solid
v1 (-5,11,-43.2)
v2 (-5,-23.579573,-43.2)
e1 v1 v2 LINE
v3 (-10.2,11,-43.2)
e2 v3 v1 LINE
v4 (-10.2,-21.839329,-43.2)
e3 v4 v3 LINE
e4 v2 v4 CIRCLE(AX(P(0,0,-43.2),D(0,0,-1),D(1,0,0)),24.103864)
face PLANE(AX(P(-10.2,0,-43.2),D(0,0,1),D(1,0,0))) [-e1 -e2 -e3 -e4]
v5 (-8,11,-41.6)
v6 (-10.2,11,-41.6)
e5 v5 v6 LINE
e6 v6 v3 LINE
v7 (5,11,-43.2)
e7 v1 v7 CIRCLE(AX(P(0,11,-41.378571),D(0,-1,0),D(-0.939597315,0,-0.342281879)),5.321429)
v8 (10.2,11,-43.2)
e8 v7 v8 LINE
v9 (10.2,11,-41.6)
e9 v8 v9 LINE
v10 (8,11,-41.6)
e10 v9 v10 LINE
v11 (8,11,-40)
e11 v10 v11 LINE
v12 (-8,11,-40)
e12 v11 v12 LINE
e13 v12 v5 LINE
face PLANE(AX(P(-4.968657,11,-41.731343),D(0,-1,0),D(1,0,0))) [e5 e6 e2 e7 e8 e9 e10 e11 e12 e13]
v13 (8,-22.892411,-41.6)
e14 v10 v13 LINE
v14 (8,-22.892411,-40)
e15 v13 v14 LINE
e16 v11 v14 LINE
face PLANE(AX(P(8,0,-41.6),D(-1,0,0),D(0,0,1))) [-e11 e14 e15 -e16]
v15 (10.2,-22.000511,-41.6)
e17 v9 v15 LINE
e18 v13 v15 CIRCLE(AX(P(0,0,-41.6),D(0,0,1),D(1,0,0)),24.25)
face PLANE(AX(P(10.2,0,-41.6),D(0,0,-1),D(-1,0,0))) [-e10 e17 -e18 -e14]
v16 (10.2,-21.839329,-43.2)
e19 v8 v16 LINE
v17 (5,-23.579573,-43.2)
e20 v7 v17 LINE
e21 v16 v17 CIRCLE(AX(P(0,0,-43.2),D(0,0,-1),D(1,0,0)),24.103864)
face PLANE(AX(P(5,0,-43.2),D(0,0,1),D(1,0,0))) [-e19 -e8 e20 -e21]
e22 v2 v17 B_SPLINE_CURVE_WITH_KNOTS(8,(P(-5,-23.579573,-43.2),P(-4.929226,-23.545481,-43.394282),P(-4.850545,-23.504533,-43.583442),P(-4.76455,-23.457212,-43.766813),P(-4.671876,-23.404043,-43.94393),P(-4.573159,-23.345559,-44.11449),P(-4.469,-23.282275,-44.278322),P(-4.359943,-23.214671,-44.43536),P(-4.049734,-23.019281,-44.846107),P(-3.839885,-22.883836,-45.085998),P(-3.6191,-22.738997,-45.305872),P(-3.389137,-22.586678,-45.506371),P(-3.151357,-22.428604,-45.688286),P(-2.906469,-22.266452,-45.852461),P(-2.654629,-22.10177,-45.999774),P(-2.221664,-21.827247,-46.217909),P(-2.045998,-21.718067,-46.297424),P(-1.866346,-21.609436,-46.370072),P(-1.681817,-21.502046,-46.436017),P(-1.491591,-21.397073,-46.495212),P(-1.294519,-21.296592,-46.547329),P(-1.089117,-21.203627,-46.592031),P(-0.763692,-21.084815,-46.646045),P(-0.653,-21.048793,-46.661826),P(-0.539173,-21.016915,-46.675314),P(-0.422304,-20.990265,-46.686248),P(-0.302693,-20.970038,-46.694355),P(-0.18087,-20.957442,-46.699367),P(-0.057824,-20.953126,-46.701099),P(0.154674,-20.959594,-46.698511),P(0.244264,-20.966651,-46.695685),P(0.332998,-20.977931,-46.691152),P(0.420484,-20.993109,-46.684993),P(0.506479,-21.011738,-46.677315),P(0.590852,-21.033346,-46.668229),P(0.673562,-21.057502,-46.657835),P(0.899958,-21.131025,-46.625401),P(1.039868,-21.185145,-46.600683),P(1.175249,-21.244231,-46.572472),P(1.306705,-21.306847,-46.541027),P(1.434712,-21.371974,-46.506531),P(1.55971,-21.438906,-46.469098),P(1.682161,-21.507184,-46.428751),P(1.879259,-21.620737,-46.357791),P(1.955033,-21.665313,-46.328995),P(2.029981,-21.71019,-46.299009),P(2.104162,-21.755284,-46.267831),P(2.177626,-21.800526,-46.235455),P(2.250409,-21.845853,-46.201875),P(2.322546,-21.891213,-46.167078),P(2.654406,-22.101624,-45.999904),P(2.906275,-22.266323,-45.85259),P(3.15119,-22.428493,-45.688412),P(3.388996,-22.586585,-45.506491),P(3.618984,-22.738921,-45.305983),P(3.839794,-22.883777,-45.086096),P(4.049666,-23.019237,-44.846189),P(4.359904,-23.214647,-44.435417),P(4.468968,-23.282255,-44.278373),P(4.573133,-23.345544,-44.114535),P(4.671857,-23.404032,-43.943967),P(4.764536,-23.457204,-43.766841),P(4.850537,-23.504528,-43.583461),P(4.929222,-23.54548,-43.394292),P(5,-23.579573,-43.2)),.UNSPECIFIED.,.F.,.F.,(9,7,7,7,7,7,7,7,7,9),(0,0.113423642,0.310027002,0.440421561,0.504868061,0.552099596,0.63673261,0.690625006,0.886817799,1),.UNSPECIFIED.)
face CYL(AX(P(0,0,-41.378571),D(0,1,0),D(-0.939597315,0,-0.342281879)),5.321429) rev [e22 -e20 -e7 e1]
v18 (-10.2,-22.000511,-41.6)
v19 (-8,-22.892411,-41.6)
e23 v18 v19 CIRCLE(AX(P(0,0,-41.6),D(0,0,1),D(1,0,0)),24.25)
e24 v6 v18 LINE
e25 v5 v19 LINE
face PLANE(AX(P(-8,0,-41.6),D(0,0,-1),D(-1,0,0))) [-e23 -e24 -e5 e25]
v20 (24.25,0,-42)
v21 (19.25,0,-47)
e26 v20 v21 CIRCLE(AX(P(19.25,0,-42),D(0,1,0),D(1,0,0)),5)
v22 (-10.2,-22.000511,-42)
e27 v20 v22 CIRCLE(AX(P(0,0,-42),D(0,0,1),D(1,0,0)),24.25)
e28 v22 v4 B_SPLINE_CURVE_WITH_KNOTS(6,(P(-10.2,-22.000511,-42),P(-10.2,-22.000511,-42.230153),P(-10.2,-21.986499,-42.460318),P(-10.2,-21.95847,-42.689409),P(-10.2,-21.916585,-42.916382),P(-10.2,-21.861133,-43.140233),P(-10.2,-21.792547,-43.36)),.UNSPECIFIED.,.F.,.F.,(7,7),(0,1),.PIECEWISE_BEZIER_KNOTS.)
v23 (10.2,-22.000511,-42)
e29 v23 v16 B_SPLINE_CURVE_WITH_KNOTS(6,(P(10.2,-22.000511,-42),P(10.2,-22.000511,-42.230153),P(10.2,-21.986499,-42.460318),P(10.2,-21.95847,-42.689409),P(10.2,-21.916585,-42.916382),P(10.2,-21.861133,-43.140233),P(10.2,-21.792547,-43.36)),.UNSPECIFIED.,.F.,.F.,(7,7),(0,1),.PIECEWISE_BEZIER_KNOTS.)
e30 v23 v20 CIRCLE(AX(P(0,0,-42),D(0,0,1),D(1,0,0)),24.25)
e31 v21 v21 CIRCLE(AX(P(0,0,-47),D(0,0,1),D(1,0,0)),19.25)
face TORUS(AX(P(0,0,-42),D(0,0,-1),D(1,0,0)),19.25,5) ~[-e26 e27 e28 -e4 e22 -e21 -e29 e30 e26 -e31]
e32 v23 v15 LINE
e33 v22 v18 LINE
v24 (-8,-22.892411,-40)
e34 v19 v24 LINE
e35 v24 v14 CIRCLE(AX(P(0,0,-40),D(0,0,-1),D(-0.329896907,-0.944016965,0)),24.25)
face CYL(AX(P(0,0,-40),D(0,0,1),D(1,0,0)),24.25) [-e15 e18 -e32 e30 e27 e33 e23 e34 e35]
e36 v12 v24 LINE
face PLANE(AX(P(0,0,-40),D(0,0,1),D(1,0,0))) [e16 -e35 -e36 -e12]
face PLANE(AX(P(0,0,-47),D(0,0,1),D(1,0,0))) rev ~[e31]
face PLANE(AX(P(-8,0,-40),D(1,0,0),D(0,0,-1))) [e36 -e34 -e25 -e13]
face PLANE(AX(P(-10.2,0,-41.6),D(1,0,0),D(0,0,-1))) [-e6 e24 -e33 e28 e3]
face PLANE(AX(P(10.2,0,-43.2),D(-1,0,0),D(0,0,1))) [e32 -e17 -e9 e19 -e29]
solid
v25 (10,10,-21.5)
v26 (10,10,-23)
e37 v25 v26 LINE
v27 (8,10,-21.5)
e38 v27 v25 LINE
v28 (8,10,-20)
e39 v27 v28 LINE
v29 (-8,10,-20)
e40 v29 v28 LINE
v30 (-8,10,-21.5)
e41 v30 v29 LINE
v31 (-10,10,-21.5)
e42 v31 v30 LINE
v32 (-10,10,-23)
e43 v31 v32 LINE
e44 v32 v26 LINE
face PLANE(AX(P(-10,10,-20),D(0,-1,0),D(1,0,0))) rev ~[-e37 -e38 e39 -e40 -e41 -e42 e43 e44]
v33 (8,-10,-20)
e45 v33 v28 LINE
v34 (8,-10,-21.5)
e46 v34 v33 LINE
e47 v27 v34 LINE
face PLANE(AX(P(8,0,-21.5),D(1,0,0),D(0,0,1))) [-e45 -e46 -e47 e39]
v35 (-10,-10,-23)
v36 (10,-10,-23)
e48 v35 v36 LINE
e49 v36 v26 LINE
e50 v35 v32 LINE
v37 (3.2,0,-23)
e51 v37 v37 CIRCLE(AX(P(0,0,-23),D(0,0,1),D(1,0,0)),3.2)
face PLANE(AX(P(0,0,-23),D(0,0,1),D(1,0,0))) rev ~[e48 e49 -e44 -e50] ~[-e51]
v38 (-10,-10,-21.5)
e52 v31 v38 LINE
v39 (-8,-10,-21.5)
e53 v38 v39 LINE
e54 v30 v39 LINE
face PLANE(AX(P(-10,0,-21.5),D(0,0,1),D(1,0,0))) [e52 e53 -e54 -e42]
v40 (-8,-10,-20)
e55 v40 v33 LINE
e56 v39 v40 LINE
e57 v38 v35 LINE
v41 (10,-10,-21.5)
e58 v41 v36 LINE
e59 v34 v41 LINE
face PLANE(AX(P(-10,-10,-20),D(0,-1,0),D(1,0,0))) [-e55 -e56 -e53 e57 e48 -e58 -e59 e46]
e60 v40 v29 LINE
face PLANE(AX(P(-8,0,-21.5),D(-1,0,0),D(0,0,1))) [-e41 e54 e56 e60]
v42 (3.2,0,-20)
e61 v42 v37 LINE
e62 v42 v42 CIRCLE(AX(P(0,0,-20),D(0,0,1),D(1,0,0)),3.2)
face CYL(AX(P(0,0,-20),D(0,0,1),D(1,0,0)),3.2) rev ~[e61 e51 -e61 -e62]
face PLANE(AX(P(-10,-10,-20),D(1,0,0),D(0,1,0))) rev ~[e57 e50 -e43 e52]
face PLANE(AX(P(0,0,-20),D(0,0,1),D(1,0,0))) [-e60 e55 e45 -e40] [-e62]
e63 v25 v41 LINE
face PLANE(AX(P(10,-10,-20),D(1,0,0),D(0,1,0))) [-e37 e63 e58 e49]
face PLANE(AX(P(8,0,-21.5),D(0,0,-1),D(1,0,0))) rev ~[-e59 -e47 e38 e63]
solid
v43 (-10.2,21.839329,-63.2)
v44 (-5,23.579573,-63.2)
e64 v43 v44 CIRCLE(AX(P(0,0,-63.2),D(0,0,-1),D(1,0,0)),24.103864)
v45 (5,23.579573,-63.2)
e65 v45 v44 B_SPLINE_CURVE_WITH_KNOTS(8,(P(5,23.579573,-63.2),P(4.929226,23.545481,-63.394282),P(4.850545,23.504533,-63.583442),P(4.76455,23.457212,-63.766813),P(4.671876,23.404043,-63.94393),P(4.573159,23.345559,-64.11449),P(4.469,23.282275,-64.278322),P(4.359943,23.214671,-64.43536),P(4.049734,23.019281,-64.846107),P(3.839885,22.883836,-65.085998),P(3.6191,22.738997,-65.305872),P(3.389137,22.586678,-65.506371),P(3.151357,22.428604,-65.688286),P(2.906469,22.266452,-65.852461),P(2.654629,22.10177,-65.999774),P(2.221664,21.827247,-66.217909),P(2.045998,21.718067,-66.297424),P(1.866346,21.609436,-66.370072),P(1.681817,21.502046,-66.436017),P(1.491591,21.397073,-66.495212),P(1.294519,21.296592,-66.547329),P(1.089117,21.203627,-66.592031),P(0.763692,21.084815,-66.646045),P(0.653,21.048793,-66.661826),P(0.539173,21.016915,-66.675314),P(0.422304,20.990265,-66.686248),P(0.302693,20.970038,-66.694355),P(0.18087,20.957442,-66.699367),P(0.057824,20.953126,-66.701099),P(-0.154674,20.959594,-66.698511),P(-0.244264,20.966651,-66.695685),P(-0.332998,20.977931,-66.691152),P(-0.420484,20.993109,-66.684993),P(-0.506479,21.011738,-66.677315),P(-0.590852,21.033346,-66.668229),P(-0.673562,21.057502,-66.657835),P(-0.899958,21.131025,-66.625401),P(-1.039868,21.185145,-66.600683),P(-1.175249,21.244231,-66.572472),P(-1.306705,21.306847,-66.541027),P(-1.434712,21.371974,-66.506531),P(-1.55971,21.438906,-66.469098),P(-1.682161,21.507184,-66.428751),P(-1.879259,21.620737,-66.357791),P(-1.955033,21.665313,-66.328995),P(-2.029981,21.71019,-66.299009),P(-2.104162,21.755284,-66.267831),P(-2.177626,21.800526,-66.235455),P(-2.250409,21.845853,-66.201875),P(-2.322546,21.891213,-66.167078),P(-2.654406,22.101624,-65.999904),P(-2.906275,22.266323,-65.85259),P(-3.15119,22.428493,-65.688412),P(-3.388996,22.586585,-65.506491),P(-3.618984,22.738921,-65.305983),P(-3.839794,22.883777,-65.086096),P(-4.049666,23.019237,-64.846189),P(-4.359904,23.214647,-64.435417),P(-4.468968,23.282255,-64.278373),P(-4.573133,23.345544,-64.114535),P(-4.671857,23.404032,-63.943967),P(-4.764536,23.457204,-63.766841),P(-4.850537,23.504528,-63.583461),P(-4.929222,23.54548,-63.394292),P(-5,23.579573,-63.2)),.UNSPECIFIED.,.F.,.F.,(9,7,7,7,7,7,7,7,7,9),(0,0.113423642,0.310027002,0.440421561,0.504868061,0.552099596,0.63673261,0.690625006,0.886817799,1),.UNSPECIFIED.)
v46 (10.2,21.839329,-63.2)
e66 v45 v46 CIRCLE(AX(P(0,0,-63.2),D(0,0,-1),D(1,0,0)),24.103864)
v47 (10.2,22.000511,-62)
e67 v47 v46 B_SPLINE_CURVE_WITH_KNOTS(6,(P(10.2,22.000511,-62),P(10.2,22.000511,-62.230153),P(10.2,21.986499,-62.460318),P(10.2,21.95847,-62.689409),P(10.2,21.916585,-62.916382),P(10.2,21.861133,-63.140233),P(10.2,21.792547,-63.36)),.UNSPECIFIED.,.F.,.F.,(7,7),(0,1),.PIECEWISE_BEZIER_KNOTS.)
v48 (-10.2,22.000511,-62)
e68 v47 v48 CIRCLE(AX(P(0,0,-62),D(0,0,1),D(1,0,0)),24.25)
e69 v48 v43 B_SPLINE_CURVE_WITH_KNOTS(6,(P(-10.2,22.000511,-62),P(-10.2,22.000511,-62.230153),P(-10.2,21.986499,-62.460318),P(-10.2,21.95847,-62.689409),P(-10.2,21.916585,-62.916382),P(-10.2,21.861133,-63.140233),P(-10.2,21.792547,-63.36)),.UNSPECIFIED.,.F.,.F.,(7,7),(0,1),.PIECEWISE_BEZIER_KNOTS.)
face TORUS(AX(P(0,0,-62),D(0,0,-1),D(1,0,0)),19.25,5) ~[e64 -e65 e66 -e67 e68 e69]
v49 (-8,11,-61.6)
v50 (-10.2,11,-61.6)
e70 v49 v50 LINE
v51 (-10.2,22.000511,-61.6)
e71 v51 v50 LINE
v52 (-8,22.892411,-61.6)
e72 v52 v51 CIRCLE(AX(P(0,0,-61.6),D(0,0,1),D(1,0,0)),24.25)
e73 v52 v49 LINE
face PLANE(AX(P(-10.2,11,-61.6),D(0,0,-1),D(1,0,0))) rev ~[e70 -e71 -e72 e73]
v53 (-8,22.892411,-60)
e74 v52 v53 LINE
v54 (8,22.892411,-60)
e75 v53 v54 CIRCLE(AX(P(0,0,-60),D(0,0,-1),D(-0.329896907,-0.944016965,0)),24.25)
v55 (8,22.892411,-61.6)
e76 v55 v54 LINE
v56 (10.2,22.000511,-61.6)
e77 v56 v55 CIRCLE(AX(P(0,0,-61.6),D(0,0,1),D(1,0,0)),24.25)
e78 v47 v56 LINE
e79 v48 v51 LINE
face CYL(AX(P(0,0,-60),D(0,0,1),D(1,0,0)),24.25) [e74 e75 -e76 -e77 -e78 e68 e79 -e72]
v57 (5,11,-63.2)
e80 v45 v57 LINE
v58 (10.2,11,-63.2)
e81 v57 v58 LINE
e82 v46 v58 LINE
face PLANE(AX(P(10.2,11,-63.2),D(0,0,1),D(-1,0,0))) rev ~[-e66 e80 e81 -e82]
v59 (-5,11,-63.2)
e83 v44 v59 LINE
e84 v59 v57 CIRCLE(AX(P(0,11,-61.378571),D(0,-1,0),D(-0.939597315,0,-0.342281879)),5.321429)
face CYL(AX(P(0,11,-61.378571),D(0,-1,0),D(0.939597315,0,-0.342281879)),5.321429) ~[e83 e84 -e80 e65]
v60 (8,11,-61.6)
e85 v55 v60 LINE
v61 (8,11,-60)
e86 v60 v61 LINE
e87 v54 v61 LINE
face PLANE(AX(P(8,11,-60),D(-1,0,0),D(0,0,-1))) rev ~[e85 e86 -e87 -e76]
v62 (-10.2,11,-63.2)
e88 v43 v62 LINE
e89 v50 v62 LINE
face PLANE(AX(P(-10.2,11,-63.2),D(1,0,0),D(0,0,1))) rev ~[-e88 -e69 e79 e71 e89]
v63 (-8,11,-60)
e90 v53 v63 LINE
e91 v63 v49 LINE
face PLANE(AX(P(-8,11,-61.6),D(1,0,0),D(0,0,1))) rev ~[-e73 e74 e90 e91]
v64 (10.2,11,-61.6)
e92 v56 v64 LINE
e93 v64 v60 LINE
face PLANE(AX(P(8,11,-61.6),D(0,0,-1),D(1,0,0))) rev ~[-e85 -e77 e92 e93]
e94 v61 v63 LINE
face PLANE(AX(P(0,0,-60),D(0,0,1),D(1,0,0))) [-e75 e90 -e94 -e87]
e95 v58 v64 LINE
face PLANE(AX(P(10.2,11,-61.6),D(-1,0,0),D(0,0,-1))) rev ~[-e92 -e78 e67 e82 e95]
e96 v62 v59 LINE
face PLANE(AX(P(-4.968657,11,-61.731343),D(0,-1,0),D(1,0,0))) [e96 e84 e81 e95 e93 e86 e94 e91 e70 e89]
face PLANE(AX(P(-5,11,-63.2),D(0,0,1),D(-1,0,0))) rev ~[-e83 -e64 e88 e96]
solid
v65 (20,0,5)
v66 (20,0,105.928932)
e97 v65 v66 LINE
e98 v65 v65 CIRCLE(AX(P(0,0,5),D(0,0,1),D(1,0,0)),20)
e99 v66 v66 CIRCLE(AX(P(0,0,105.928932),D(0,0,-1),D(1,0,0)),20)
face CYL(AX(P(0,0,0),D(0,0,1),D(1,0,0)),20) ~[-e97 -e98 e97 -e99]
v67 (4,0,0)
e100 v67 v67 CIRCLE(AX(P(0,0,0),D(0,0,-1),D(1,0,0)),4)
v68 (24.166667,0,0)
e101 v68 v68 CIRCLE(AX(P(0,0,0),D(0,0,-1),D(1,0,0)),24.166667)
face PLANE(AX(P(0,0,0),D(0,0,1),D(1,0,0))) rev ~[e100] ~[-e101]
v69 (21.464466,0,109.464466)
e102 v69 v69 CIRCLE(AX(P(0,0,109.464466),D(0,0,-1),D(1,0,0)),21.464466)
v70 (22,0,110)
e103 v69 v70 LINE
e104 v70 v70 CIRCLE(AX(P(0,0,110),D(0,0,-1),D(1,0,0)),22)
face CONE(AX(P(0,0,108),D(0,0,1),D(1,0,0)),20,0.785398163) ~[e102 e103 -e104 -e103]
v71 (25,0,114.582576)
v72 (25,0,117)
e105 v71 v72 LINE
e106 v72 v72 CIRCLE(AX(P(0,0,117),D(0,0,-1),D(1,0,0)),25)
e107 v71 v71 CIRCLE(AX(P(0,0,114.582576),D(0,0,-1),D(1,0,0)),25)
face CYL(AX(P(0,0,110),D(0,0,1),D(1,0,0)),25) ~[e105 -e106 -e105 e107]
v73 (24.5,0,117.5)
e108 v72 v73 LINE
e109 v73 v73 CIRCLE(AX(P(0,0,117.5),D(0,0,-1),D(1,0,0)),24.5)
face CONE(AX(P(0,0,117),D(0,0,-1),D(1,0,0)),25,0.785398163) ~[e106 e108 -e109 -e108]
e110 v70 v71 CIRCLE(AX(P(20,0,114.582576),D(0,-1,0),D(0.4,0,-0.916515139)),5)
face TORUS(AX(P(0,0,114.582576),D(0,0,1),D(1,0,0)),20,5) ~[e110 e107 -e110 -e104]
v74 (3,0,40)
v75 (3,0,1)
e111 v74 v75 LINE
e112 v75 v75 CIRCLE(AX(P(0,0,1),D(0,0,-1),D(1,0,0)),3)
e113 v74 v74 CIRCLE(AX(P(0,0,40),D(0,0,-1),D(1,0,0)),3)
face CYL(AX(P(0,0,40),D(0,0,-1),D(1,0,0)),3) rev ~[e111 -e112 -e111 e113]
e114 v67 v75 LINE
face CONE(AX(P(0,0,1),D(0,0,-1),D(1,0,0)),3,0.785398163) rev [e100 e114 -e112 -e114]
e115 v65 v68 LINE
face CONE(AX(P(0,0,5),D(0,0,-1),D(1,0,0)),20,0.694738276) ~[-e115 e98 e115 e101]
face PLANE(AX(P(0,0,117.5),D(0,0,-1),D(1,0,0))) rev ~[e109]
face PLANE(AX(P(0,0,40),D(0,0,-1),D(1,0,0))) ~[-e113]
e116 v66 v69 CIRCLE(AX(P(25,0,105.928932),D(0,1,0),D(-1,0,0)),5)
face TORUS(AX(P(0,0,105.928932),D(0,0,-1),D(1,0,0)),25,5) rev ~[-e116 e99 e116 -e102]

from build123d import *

# Parameters (mm, degrees)
F2_SIZE     = 2
F4_SIZE     = 1
F5_SIZE     = 0.5
F6_R        = 25
F6_R_2      = 20
F7_DEPTH    = 5
F8_S5_R     = 20
F8_T6_DEPTH = 37
F10_W       = 20
F10_H       = 20
F10_R       = 3.2
F11_DEPTH   = 3
F12_W       = 2
F12_H       = 1.5
F13_DEPTH   = 10
F15_R       = 24.25
F16_DEPTH   = 7
F17_R       = 5
F19_DEPTH   = 25
F20_DEPTH   = 11
F23_DEPTH   = 50


# Not quite as in the source:
# - a fillet or chamfer that OpenCascade refuses, or shapes differently, is made with other operations: its cross-section is extruded or revolved along the edge and cut away or added


with BuildPart() as f1:
    # F0 (on Front) → F1 (revolve)
    with BuildSketch(Plane.XZ):
        Polygon((3, 40), (3, 0), (20, 0), (20, 110), (25, 110), (25, 117.5), (0, 117.5), (0, 40), align=None)
    revolve(axis=Axis((0, 0, 78.75), (0, 0, -1)))

    # F2
    f2_edges = [f1.edges().sort_by_distance(p)[0] for p in [
        (-20, 0, 110),
    ]]
    chamfer(f2_edges, length=F2_SIZE)

    # F3: fillet of radius 5 on 2 edges, made by hand

    # F3_s1 → F3_t2 (revolve)
    with BuildSketch(Plane.XZ):
        with BuildLine():
            ThreePointArc((20, 105.9289321881), (20.3806023374, 107.84234935), (21.4644660941, 109.4644660941))
            Line((21.4644660941, 109.4644660941), (20, 108))
            Line((20, 108), (20, 105.9289321881))
        make_face()
    revolve(axis=Axis((0, 0, 108), (0, 0, -1)))

    # F3_s3 → F3_t4 (revolve, cut)
    with BuildSketch(Plane.XZ):
        with BuildLine():
            ThreePointArc((22, 110), (24.1833001327, 111.8439629074), (25, 114.582575695))
            Line((25, 114.582575695), (25, 110))
            Line((25, 110), (22, 110))
        make_face()
    revolve(axis=Axis((0, 0, 110), (0, 0, -1)), mode=Mode.SUBTRACT)

    # F4
    f4_edges = [f1.edges().sort_by_distance(p)[0] for p in [
        (-3, 0, 0),
    ]]
    chamfer(f4_edges, length=F4_SIZE)

    # F5
    f5_edges = [f1.edges().sort_by_distance(p)[0] for p in [
        (-25, 0, 117.5),
    ]]
    chamfer(f5_edges, length=F5_SIZE)

    # F6 (on Top) → F7 (join)
    with BuildSketch(Plane.XY):
        Circle(F6_R)
        Circle(F6_R_2, mode=Mode.SUBTRACT)
    extrude(amount=F7_DEPTH)

    # F8: chamfer of 5 x 6 on 1 edges, made by hand


with BuildPart() as f8_tool2:
    # F8_s3 → F8_t4 (revolve)
    with BuildSketch(Plane.XZ):
        Polygon((20, 5), (25, -1), (25, 5), align=None)
    revolve(axis=Axis((0, 0, 5), (0, 0, 1)))

    # F8_s5 → F8_t6 (cut, symmetric)
    with BuildSketch(Plane.XY.offset(2)):
        Circle(F8_S5_R)
    extrude(amount=F8_T6_DEPTH, both=True, mode=Mode.SUBTRACT)


with BuildPart() as f1_1:
    add(f1.part)

    # F8_t1: cut F8_tool2
    add(f8_tool2.part, mode=Mode.SUBTRACT)


with BuildPart() as f11:
    # F10 (on offset) → F11 (new body)
    with BuildSketch(Plane.XY.offset(-20)):
        Rectangle(F10_W, F10_H)
        Circle(F10_R, mode=Mode.SUBTRACT)
    extrude(amount=-F11_DEPTH)

    # F12 (on Front) → F13 (cut, symmetric)
    with BuildSketch(Plane.XZ):
        with Locations((-9, -20.75)):
            Rectangle(F12_W, F12_H)
        with Locations((9, -20.75)):
            Rectangle(F12_W, F12_H)
    extrude(amount=F13_DEPTH, both=True, mode=Mode.SUBTRACT)


with BuildPart() as f16:
    # F15 (on offset) → F16 (new body)
    with BuildSketch(Plane.XY.offset(-40)):
        Circle(F15_R)
    extrude(amount=-F16_DEPTH)

    # F17
    f17_edges = [f16.edges().sort_by_distance(p)[0] for p in [
        (-24.25, 0, -47),
    ]]
    fillet(f17_edges, radius=F17_R)

    # F18 (on Front) → F19 (cut)
    with BuildSketch(Plane.XZ):
        Polygon((0, -43.2), (0, -40), (-8, -40), (-8, -41.6), (-10.2, -41.6), (-10.2, -43.2), (-5, -43.2), align=None)
        Polygon((8, -40), (0, -40), (0, -43.2), (5, -43.2), (10.2, -43.2), (10.2, -41.6), (8, -41.6), align=None)
        with BuildLine():
            Line((5, -43.2), (0, -43.2))
            Line((0, -43.2), (-5, -43.2))
            ThreePointArc((-5, -43.2), (0, -46.7), (5, -43.2))
        make_face()
    extrude(amount=F19_DEPTH, mode=Mode.SUBTRACT)

    # F20 (cut): a face of the model
    f20_faces = [f16.faces().sort_by_distance(p)[0] for p in [
        (0, 0, -42.595240959),
    ]]
    extrude(f20_faces, amount=-F20_DEPTH, mode=Mode.SUBTRACT)


with BuildPart() as f21_1:
    # F21: copy of F16
    add(f16.part.moved(Location((0, 0, -20))))

    # F22 (on face) → F23 (cut, symmetric)
    with BuildSketch(Plane.XZ.offset(-11)):
        with BuildLine():
            Line((31.9885127246, -60), (8, -60))
            Line((8, -60), (8, -61.6))
            Line((8, -61.6), (10.2, -61.6))
            Line((10.2, -61.6), (10.2, -63.2))
            Line((10.2, -63.2), (5, -63.2))
            ThreePointArc((5, -63.2), (0, -66.7), (-5, -63.2))
            Line((-5, -63.2), (-10.2, -63.2))
            Line((-10.2, -63.2), (-10.2, -61.6))
            Line((-10.2, -61.6), (-8, -61.6))
            Line((-8, -61.6), (-8, -60))
            Line((-8, -60), (-32.2001688182, -60))
            Line((-32.2001688182, -60), (-32.2001688182, -71.0251182318))
            Line((-32.2001688182, -71.0251182318), (31.9885127246, -71.0251182318))
            Line((31.9885127246, -71.0251182318), (31.9885127246, -60))
        make_face()
    extrude(amount=F23_DEPTH, both=True, mode=Mode.SUBTRACT)


solid = Compound([f1_1.part, f11.part, f16.part, f21_1.part])
